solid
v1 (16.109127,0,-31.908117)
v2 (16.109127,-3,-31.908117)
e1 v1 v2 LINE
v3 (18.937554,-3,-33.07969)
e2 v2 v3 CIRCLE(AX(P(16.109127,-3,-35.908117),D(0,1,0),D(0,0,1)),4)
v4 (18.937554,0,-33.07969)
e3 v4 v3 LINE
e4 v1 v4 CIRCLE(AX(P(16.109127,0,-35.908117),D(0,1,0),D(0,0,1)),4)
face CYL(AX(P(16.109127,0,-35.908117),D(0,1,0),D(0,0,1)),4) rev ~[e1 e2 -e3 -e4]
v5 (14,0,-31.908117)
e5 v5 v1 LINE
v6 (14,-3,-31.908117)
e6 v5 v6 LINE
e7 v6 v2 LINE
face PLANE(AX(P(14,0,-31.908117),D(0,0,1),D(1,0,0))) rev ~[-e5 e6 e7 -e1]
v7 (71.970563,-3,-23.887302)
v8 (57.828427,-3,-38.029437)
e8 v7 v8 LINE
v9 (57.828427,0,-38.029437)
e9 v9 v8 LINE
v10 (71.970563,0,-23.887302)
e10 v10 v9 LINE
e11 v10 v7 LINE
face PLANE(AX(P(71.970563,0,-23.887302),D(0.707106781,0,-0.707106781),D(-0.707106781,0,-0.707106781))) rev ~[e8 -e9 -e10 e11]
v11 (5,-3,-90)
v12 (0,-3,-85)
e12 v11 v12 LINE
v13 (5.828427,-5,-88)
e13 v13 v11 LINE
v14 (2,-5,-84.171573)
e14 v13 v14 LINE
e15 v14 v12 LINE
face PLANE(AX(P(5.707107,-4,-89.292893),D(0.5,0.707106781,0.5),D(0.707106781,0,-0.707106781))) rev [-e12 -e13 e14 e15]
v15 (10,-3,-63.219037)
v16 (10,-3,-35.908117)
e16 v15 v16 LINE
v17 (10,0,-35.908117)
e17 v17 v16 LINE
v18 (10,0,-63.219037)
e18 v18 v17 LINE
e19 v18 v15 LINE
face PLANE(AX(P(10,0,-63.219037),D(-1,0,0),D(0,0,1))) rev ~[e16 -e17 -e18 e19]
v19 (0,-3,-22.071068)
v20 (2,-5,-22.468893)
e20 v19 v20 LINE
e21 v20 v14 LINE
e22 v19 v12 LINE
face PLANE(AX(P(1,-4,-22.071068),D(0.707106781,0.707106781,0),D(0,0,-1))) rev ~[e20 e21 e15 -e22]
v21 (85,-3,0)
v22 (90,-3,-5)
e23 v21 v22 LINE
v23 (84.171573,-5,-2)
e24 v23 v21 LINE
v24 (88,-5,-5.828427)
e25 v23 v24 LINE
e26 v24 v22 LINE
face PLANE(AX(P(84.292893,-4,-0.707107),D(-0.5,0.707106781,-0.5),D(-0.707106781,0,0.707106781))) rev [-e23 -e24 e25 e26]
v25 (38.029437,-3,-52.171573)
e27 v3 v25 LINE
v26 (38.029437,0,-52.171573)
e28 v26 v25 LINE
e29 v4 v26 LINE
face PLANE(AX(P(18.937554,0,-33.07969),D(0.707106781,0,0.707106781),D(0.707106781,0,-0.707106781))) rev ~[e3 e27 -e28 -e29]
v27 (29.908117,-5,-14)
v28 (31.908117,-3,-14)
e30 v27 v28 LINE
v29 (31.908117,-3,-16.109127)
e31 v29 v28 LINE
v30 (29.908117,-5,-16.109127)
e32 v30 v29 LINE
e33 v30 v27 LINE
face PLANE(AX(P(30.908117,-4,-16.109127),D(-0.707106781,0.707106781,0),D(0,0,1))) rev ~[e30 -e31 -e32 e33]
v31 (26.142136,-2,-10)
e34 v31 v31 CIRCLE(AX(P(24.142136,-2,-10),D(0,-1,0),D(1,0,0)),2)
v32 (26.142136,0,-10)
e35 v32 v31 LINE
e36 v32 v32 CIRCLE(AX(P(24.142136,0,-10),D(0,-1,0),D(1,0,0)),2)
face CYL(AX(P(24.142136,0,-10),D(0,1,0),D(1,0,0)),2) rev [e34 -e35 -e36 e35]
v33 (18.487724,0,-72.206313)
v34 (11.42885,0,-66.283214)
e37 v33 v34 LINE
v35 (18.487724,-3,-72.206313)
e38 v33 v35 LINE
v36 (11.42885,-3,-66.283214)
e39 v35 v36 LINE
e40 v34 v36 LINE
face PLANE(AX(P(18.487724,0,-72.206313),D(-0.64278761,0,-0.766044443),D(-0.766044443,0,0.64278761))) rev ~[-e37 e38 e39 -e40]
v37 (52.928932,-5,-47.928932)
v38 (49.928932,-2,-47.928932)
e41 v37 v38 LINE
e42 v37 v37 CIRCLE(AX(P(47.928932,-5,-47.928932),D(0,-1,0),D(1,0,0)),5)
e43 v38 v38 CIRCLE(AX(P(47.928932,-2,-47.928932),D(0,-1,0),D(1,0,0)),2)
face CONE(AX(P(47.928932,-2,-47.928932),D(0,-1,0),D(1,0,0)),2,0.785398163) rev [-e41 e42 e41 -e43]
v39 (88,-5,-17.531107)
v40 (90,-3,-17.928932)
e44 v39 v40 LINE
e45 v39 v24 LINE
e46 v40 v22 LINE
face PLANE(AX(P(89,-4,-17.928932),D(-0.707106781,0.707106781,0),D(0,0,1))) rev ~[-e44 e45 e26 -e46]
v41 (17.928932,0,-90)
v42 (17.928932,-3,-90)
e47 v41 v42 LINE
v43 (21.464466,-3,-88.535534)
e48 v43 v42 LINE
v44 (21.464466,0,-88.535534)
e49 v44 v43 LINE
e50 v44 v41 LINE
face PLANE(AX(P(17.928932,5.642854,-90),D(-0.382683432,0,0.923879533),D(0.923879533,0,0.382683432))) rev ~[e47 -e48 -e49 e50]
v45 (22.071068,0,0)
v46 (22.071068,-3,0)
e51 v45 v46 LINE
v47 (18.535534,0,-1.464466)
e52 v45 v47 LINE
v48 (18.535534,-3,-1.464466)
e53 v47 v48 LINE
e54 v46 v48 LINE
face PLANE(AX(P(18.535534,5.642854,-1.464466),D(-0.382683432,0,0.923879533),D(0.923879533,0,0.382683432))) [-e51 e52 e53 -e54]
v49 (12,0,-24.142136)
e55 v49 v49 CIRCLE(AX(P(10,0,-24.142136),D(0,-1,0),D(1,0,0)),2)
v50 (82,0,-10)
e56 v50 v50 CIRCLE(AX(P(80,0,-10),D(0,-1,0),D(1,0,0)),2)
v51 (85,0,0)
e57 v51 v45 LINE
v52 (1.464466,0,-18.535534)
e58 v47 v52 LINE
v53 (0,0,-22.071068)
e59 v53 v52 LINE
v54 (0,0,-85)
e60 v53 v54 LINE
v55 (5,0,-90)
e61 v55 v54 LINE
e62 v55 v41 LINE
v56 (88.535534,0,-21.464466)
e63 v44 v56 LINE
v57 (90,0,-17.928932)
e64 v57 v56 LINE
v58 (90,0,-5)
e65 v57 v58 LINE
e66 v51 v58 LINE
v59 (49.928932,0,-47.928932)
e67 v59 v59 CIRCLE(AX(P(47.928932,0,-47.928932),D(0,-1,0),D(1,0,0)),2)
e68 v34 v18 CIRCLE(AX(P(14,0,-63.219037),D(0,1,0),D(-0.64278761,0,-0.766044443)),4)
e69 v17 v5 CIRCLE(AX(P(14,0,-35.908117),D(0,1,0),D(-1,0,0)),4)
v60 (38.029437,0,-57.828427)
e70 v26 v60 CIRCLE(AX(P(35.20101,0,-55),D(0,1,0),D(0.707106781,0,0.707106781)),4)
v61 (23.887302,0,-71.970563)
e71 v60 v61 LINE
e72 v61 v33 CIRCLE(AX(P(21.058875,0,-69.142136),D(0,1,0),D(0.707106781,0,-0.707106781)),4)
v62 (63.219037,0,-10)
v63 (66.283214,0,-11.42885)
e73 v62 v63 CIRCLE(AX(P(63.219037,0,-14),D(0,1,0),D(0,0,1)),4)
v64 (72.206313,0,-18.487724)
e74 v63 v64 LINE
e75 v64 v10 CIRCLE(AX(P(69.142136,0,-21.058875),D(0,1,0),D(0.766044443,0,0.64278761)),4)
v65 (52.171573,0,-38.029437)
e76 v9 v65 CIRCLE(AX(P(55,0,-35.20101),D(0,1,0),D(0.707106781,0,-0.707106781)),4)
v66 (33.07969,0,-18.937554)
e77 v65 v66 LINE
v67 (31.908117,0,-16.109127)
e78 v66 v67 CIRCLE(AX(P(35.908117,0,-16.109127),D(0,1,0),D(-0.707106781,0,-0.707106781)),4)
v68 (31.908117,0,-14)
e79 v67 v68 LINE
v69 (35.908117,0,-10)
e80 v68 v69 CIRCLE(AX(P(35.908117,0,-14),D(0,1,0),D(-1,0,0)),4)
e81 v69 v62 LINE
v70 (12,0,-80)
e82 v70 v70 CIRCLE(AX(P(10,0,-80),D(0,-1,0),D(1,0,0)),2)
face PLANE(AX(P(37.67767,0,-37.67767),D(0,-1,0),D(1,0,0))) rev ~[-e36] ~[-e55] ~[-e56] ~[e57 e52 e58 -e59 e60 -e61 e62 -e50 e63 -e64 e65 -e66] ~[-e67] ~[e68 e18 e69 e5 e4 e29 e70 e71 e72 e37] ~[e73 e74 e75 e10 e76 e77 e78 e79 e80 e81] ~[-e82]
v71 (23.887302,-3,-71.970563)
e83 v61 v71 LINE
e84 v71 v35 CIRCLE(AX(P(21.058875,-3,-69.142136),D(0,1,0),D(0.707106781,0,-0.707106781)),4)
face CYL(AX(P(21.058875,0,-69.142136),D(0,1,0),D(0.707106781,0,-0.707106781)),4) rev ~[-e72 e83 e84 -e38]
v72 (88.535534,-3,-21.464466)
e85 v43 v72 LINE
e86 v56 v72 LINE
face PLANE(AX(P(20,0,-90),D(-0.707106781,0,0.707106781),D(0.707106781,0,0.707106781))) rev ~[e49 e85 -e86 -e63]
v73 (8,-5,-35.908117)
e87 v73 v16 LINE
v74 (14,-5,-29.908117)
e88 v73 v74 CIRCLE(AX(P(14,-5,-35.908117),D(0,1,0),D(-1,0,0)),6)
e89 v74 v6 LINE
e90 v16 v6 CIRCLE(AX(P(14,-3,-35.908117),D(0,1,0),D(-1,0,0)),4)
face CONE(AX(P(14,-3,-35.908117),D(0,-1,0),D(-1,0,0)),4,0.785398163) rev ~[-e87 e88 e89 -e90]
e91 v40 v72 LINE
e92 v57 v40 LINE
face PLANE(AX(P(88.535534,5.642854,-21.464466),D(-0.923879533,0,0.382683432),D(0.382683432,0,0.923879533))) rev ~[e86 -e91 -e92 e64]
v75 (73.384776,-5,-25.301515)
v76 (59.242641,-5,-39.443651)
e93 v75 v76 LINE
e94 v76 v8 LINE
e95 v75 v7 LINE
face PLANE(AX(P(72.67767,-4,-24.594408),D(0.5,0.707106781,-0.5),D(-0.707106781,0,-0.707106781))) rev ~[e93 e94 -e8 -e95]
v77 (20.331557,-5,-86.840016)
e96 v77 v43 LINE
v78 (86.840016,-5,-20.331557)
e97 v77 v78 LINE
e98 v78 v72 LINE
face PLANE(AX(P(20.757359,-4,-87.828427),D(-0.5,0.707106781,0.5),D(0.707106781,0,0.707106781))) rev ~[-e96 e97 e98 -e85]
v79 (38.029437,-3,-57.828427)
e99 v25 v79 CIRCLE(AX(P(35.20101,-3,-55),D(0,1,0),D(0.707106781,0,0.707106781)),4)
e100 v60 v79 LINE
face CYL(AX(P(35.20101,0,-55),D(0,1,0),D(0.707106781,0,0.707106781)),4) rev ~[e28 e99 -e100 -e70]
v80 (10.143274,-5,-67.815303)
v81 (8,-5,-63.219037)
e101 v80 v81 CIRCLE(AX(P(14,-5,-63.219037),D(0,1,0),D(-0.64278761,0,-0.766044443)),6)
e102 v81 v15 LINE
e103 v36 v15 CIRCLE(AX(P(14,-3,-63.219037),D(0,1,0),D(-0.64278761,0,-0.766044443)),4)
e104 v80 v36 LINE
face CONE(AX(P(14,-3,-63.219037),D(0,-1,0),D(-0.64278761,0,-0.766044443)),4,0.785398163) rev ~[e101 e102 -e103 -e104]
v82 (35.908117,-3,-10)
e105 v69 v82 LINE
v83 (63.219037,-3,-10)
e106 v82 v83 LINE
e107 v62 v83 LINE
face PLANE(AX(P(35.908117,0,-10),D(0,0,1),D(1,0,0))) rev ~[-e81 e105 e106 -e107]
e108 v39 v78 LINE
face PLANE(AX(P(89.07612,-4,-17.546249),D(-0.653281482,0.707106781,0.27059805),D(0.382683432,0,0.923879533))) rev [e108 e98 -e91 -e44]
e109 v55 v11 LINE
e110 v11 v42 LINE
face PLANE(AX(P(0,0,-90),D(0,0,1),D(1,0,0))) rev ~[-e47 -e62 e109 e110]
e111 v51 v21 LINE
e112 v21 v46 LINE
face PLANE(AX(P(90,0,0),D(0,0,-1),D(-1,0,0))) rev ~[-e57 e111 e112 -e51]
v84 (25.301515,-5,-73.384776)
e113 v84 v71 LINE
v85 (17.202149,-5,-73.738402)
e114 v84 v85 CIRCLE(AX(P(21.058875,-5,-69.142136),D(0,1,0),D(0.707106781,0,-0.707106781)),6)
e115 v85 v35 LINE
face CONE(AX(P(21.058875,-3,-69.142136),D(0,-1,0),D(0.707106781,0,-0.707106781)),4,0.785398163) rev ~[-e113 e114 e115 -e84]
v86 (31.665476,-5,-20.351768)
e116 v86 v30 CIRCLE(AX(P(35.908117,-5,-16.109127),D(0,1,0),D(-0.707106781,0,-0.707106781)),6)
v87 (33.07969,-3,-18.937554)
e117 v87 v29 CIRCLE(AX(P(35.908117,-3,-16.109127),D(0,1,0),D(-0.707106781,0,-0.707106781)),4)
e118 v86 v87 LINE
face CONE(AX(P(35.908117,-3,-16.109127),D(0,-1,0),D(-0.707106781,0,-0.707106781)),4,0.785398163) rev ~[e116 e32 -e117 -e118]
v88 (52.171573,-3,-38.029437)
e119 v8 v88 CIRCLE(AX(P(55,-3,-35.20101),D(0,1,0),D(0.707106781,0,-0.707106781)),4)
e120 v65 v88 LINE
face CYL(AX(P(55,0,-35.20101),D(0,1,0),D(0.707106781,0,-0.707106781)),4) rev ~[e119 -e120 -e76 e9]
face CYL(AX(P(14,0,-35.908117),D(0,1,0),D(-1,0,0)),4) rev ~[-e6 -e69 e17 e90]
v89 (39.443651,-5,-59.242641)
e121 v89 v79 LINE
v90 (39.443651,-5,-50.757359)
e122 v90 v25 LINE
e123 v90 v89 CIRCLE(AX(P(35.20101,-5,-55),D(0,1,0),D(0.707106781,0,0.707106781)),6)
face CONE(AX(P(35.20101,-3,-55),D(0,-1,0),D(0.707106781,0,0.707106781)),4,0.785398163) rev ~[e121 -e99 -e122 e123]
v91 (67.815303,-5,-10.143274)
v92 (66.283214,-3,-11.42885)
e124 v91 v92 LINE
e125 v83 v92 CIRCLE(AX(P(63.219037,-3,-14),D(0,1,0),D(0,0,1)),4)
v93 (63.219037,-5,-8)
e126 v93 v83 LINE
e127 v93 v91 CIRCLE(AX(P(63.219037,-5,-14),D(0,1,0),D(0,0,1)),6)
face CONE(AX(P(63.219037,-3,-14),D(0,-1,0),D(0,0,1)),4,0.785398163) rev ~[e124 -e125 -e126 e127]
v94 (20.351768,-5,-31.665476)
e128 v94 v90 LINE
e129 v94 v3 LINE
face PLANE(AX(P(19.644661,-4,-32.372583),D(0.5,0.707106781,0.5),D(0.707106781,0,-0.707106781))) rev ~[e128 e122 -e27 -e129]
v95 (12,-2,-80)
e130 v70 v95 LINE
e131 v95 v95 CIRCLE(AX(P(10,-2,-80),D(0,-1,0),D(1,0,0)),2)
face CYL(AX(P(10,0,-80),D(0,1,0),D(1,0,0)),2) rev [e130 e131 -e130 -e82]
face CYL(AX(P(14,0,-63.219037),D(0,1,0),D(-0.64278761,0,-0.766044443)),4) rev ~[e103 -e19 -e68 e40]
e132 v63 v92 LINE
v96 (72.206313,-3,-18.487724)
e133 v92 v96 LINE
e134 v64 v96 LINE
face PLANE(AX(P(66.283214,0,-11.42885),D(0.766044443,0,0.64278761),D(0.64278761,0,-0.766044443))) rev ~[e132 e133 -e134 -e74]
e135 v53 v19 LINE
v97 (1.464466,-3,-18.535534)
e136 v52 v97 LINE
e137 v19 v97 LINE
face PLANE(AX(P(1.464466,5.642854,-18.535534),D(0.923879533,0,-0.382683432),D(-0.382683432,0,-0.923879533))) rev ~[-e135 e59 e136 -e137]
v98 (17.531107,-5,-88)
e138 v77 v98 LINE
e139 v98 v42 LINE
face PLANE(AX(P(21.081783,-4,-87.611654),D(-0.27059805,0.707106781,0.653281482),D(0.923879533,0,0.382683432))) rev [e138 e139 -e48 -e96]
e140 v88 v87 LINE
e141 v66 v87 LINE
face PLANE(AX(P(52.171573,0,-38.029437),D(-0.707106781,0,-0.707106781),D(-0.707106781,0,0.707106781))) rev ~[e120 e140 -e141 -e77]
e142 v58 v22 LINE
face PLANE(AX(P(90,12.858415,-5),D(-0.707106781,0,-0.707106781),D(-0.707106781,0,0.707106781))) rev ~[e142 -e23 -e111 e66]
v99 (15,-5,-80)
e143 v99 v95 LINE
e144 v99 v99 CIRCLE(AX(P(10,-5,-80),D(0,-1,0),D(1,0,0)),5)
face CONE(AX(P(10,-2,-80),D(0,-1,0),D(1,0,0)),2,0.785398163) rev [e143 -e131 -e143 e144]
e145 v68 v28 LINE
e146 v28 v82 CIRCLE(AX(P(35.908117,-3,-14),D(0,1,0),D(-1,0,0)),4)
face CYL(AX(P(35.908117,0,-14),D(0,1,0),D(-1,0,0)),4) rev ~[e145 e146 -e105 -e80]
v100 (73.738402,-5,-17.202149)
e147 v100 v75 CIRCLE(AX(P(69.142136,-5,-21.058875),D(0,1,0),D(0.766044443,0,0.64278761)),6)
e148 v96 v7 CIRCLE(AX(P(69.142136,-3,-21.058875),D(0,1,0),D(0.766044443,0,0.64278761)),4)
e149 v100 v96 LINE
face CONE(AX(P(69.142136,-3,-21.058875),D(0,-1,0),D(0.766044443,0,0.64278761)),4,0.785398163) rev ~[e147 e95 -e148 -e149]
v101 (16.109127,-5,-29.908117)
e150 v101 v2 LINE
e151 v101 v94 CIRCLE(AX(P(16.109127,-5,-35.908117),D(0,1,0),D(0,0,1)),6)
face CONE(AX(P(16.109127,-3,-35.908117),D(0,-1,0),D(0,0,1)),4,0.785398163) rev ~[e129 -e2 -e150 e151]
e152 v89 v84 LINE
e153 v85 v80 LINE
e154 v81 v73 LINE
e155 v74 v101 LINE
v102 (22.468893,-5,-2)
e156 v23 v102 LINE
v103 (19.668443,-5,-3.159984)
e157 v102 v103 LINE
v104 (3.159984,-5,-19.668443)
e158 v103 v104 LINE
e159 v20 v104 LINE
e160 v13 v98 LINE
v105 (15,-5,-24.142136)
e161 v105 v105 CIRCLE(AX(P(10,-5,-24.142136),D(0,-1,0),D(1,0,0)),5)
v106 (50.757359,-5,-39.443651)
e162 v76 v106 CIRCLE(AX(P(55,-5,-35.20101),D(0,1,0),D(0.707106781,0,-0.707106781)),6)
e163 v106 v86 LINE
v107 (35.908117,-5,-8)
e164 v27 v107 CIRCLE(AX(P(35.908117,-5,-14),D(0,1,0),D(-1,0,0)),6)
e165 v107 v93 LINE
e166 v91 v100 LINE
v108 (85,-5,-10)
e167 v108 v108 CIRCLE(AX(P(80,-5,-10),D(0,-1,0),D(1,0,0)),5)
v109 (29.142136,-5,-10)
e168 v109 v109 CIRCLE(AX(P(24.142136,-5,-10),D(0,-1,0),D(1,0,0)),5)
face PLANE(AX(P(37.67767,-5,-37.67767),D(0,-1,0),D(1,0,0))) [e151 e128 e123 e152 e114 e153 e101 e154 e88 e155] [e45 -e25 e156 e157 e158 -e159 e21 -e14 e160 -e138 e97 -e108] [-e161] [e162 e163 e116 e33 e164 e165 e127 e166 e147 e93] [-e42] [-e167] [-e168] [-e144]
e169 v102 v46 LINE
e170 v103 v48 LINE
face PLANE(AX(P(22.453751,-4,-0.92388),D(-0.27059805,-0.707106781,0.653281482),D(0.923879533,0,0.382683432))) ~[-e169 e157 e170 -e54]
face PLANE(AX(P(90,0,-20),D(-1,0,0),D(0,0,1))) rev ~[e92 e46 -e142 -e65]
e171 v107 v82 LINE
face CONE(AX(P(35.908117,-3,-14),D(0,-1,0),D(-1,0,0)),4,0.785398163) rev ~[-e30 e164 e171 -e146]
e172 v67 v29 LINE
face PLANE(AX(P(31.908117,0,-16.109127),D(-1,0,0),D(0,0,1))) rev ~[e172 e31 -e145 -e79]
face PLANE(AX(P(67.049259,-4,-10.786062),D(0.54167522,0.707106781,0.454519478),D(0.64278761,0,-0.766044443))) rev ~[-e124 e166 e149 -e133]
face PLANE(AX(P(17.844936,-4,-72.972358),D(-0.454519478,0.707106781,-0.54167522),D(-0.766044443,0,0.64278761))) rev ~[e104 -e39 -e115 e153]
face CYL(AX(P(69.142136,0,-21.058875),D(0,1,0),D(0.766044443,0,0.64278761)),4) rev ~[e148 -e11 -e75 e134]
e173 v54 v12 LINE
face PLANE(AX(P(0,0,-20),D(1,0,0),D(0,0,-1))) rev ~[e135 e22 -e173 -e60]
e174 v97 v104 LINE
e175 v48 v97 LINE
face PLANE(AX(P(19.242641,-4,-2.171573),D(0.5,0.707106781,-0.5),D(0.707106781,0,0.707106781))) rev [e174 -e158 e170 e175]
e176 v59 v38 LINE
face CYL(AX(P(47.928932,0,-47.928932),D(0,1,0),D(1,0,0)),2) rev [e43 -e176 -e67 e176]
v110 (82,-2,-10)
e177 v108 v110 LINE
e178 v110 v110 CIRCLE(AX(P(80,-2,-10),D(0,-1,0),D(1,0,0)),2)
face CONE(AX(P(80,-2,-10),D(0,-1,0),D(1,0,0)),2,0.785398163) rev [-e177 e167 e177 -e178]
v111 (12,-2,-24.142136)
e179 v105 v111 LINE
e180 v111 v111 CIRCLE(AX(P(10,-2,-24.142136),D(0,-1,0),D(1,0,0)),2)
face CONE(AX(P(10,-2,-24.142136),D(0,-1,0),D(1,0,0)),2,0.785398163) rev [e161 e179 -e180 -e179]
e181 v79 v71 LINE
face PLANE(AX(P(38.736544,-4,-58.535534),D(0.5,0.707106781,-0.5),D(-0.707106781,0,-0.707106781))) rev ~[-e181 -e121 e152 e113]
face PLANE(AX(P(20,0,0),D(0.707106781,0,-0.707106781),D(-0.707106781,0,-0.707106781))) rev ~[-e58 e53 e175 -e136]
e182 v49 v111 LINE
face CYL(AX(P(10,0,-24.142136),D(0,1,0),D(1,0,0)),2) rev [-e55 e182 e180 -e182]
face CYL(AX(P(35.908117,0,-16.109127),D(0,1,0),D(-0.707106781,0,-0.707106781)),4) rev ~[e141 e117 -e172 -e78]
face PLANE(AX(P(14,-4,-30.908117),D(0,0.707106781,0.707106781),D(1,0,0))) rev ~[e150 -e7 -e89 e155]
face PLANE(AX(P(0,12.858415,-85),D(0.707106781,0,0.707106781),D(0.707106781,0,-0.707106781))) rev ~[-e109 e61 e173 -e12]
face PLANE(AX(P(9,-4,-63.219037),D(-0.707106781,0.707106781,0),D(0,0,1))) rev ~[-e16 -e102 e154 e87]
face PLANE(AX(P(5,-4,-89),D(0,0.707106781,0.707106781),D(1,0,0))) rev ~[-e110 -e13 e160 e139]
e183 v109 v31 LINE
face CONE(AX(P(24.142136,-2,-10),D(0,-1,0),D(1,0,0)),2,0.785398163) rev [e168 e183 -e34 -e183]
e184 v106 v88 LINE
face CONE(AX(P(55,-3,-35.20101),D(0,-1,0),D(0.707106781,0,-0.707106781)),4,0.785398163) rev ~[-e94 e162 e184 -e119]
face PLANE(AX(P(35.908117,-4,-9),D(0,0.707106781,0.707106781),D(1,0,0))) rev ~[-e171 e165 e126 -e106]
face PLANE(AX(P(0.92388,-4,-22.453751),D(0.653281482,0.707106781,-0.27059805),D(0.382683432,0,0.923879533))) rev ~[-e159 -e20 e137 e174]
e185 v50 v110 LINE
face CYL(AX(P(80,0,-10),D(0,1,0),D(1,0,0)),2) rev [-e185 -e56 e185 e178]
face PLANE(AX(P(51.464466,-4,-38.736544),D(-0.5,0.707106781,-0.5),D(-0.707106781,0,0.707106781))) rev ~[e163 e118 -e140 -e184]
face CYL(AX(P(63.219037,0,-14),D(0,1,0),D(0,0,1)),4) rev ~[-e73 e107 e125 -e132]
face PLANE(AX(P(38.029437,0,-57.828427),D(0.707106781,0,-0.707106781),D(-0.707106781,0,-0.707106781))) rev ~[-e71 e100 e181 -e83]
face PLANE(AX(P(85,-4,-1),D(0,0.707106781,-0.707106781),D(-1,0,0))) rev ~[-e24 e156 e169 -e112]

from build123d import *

# Parameters (mm, degrees)
F0_R        = 2
F1_DEPTH    = 5
F2_T1_DEPTH = 30.7168298797
F2_T3_DEPTH = 16.2857086021
F3_SIZE     = 2
F4_SIZE     = 3
F5_SIZE     = 2


# Not quite as in the source:
# - a fillet or chamfer that OpenCascade refuses, or shapes differently, is made with other operations: its cross-section is extruded or revolved along the edge and cut away or added


with BuildPart() as f1:
    # F0 (on Front) → F1 (new body)
    with BuildSketch(Plane.XZ):
        Polygon((20, 0), (0, -20), (0, -90), (20, -90), (90, -20), (90, 0), align=None)
        with Locations((10, -80)):
            Circle(F0_R, mode=Mode.SUBTRACT)
        with BuildLine():
            Line((14, -31.908116908), (16.1091270347, -31.908116908))
            ThreePointArc((16.1091270347, -31.908116908), (17.6398607642, -32.2125987779), (18.9375541595, -33.0796897832))
            Line((18.9375541595, -33.0796897832), (38.0294372515, -52.1715728753))
            ThreePointArc((38.0294372515, -52.1715728753), (39.2010101268, -55), (38.0294372515, -57.8284271247))
            Line((38.0294372515, -57.8284271247), (23.8873016278, -71.9705627485))
            ThreePointArc((23.8873016278, -71.9705627485), (21.2333520525, -73.1383285101), (18.4877240643, -72.2063133962))
            Line((18.4877240643, -72.2063133962), (11.4288495613, -66.2832144042))
            ThreePointArc((11.4288495613, -66.2832144042), (10.3747688519, -64.9095096787), (10, -63.2190366317))
            Line((10, -63.2190366317), (10, -35.908116908))
            ThreePointArc((10, -35.908116908), (11.1715728753, -33.0796897832), (14, -31.908116908))
        make_face(mode=Mode.SUBTRACT)
        with Locations((47.9289321881, -47.9289321881)):
            Circle(F0_R, mode=Mode.SUBTRACT)
        with Locations((10, -24.1421356237)):
            Circle(F0_R, mode=Mode.SUBTRACT)
        with Locations((24.1421356237, -10)):
            Circle(F0_R, mode=Mode.SUBTRACT)
        with BuildLine():
            ThreePointArc((63.2190366317, -10), (64.9095096787, -10.3747688519), (66.2832144042, -11.4288495613))
            Line((66.2832144042, -11.4288495613), (72.2063133962, -18.4877240643))
            ThreePointArc((72.2063133962, -18.4877240643), (73.1383285101, -21.2333520525), (71.9705627485, -23.8873016278))
            Line((71.9705627485, -23.8873016278), (57.8284271247, -38.0294372515))
            ThreePointArc((57.8284271247, -38.0294372515), (55, -39.2010101268), (52.1715728753, -38.0294372515))
            Line((52.1715728753, -38.0294372515), (33.0796897832, -18.9375541595))
            ThreePointArc((33.0796897832, -18.9375541595), (32.2125987779, -17.6398607642), (31.908116908, -16.1091270347))
            Line((31.908116908, -16.1091270347), (31.908116908, -14))
            ThreePointArc((31.908116908, -14), (33.0796897832, -11.1715728753), (35.908116908, -10))
            Line((35.908116908, -10), (63.2190366317, -10))
        make_face(mode=Mode.SUBTRACT)
        with Locations((80, -10)):
            Circle(F0_R, mode=Mode.SUBTRACT)
    extrude(amount=F1_DEPTH)

    # F2: chamfer of 5 on 6 edges, made by hand

    # F2_s2 → F2_t1 (cut)
    with BuildSketch(Plane.XZ.offset(-12.8584149398)):
        Polygon((90, -5), (85, 0), (90, 0), align=None)
        Polygon((0, -85), (5, -90), (0, -90), align=None)
    extrude(amount=F2_T1_DEPTH, mode=Mode.SUBTRACT)

    # F2_s4 → F2_t3 (cut)
    with BuildSketch(Plane.XZ.offset(-5.6428543011)):
        Polygon((1.4644660941, -18.5355339059), (0, -22.0710678119), (0, -20), align=None)
        Polygon((18.5355339059, -1.4644660941), (22.0710678119, 0), (20, 0), align=None)
        Polygon((88.5355339059, -21.4644660941), (90, -17.9289321881), (90, -20), align=None)
        Polygon((17.9289321881, -90), (21.4644660941, -88.5355339059), (20, -90), align=None)
    extrude(amount=F2_T3_DEPTH, mode=Mode.SUBTRACT)

    # F3
    f3_edges = [f1.edges().sort_by_distance(p)[0] for p in [
        (0.732233, -5, -20.303301),
        (20.303301, -5, -0.732233),
        (10, -5, -10),
        (87.5, -5, -2.5),
        (89.267767, -5, -19.696699),
        (90, -5, -11.464466),
        (53.535534, -5, 0),
        (19.696699, -5, -89.267767),
        (2.5, -5, -87.5),
        (11.464466, -5, -90),
        (0, -5, -53.535534),
        (55, -5, -55),
    ]]
    chamfer(f3_edges, length=F3_SIZE)

    # F4
    f4_edges = [f1.edges().sort_by_distance(p)[0] for p in [
        (8, -5, -24.142136),
        (22.142136, -5, -10),
        (78, -5, -10),
        (45.928932, -5, -47.928932),
        (8, -5, -80),
    ]]
    chamfer(f4_edges, length=F4_SIZE)

    # F5
    f5_edges = [f1.edges().sort_by_distance(p)[0] for p in [
        (30.958369, -5, -64.899495),
        (21.233352, -5, -73.138329),
        (14.958287, -5, -69.244764),
        (10.374769, -5, -64.90951),
        (10, -5, -49.563577),
        (11.171573, -5, -33.07969),
        (17.639861, -5, -32.212599),
        (14, -2.5, -31.908117),
        (15.054564, -5, -31.908117),
        (28.483496, -5, -42.625631),
        (39.20101, -5, -55),
        (42.625631, -5, -28.483496),
        (33.07969, -5, -11.171573),
        (31.908117, -5, -15.054564),
        (49.563577, -5, -10),
        (32.212599, -5, -17.639861),
        (64.90951, -5, -10.374769),
        (69.244764, -5, -14.958287),
        (55, -5, -39.20101),
        (73.138329, -5, -21.233352),
        (64.899495, -5, -30.958369),
    ]]
    chamfer(f5_edges, length=F5_SIZE)


solid = f1.part
